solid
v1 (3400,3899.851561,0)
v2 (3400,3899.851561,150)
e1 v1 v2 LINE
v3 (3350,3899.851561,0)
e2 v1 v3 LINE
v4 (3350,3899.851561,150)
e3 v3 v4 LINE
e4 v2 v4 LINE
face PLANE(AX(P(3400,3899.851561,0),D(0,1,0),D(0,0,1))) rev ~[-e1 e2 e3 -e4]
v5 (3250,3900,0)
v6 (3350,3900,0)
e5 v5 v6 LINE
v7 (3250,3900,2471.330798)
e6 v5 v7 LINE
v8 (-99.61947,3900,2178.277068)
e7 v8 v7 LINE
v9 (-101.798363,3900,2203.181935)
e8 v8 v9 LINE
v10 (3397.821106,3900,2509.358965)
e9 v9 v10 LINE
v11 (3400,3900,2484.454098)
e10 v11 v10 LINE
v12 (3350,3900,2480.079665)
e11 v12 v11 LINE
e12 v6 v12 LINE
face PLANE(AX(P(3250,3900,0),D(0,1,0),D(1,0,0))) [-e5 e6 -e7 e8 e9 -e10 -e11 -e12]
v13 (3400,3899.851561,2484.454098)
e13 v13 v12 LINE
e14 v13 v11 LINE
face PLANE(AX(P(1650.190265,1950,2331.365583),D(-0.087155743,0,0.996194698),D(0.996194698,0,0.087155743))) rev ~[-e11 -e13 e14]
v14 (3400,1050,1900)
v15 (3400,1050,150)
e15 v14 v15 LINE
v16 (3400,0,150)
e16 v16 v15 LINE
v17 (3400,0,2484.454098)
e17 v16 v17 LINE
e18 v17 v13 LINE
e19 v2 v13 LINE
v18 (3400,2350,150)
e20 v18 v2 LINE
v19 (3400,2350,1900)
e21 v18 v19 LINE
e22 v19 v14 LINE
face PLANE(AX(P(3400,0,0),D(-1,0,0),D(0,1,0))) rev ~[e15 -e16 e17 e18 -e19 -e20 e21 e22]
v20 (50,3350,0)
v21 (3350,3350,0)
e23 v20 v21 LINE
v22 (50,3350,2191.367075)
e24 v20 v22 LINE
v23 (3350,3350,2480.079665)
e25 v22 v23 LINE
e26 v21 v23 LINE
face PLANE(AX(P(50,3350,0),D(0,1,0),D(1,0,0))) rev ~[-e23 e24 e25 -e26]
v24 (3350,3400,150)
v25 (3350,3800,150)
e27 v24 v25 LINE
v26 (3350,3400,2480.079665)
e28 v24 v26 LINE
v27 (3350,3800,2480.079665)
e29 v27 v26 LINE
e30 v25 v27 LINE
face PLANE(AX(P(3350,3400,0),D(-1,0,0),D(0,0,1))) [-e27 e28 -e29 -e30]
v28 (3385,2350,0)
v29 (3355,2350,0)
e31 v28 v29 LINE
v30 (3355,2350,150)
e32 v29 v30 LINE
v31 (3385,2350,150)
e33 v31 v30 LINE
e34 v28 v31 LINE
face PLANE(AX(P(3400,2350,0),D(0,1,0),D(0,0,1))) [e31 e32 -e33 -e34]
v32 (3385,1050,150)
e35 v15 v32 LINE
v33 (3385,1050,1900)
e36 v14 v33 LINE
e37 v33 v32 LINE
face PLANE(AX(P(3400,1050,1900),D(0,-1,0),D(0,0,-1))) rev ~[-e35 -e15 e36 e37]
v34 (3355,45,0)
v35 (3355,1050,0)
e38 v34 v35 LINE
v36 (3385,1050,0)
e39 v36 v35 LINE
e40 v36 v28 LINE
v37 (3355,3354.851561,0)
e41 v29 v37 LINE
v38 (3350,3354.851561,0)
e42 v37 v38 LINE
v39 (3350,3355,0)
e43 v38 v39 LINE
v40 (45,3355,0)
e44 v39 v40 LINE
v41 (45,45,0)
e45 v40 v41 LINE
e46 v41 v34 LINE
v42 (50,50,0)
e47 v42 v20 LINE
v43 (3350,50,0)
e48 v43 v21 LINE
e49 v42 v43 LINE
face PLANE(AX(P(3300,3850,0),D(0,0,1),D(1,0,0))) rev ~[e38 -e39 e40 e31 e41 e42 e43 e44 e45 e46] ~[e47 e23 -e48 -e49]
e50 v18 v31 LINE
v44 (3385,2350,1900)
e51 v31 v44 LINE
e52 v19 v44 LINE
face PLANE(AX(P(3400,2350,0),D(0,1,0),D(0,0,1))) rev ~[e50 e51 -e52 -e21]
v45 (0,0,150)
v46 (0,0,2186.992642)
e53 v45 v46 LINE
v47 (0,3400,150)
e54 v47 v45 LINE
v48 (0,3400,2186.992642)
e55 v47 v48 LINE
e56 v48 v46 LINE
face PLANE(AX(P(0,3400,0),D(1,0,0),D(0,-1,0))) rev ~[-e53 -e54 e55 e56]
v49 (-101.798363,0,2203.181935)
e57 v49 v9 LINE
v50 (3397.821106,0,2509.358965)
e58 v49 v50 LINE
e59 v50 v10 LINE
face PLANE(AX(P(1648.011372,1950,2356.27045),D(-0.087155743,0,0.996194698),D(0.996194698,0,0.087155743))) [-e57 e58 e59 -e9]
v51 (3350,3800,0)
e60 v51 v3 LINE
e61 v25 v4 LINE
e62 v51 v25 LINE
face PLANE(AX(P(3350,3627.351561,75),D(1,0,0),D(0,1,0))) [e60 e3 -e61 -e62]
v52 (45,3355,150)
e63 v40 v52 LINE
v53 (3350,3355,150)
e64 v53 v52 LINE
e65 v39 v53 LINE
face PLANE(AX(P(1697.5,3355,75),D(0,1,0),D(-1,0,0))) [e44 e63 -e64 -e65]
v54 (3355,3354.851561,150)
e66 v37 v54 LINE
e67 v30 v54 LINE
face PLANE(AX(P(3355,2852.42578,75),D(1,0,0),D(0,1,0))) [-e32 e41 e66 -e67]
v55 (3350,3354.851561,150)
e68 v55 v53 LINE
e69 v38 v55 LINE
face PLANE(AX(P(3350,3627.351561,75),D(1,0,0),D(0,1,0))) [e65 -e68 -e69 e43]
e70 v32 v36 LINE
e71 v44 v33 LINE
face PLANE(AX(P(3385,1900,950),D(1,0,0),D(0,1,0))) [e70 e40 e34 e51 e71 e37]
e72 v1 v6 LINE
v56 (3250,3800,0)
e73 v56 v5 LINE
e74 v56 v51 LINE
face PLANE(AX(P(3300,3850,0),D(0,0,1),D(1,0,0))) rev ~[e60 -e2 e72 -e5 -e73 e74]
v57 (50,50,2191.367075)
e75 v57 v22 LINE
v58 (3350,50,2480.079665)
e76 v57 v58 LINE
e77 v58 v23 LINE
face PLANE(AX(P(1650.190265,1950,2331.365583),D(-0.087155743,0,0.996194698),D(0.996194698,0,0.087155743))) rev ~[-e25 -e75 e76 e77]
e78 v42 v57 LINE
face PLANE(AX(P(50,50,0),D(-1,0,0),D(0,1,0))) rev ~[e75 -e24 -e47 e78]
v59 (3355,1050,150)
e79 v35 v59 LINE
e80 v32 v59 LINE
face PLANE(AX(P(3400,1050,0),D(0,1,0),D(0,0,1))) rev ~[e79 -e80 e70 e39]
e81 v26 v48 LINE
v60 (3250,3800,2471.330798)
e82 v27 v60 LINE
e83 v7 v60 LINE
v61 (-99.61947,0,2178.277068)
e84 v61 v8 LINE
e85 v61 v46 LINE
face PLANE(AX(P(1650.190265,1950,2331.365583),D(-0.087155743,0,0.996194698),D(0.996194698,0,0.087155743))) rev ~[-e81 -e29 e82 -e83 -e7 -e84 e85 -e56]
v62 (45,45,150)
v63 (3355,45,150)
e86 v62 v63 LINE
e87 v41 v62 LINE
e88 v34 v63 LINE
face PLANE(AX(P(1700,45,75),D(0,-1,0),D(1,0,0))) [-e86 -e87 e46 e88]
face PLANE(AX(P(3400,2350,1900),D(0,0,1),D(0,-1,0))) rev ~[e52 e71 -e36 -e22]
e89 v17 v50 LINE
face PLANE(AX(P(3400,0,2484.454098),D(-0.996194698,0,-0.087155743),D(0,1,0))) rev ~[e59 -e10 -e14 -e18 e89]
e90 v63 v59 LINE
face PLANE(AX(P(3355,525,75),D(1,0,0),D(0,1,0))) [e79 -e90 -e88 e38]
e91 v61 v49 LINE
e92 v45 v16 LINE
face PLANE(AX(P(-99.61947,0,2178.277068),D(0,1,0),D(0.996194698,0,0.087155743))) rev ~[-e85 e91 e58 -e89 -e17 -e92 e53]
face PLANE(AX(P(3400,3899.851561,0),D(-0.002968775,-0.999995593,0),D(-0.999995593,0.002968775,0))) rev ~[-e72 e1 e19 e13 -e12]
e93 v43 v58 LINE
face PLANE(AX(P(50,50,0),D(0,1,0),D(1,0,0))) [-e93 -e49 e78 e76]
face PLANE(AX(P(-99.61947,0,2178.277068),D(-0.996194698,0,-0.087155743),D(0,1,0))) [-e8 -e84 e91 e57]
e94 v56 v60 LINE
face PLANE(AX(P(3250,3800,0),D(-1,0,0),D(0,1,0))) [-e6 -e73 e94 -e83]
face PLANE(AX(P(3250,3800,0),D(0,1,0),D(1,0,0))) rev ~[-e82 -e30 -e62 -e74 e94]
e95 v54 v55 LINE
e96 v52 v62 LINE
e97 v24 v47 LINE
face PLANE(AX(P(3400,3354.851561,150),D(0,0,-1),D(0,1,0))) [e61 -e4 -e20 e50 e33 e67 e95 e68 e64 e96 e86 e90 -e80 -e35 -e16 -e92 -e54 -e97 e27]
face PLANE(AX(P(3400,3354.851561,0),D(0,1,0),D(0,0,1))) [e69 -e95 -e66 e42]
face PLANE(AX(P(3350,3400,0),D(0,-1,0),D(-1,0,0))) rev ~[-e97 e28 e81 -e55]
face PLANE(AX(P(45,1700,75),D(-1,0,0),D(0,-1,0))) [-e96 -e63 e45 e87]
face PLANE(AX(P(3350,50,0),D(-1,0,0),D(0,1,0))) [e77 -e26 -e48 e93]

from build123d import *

# Parameters (mm, degrees)
F0_W      = 3300
F0_H      = 3300
F3_REACH  = 7658.4274260304
F4_W      = 3512.9874476474
F4_H      = 3900
F5_DEPTH  = 25
F0_W_2    = 100
F0_H_2    = 100
F8_DEPTH  = 15
F10_W     = 3400
F10_H     = 150
F11_DEPTH = 45
F9_W      = 3400
F9_H      = 150
F12_DEPTH = 45
F13_W     = 3305
F13_H     = 150
F14_DEPTH = 45
F7_W      = 1050
F7_H      = 150
F15_DEPTH = 45
F7_W_2    = 1004.8515605927
F16_DEPTH = 45
F7_W_3    = 545
F17_DEPTH = 50


with BuildPart() as f3:
    f3_end = Plane(origin=(-189.8836434212, 0, 2170.3799757433), x_dir=(0.9961946981, 0, 0.0871557427), z_dir=(-0.0871557427, 0, 0.9961946981))
    # F0 (on Top) → F3 (new body, up to a plane its end follows)
    with BuildSketch(Plane.XY):
        Polygon((0, 3400), (0, 0), (3400, 0), (3400, 3400), (3400, 3899.8515605927), (3350, 3900), (3350, 3800), (3350, 3400), align=None)
        with Locations((1700, 1700)):
            Rectangle(F0_W, F0_H, mode=Mode.SUBTRACT)
    f3_long = extrude(amount=F3_REACH, mode=Mode.PRIVATE)
    add(split(f3_long, bisect_by=f3_end, keep=Keep.BOTTOM, mode=Mode.PRIVATE))

    # F4 (on offset) → F5 (join)
    with BuildSketch(Plane(origin=(-189.8836434212, 0, 2170.3799757433), x_dir=(0.9961946981, 0, 0.0871557427), z_dir=(-0.0871557427, 0, 0.9961946981))):
        with Locations((1847.1026919149, 1950)):
            Rectangle(F4_W, F4_H)
    extrude(amount=F5_DEPTH)

    # F0 (on Top) → F6 (join, up to the next surface of F3)
    with BuildSketch(Plane.XY):
        with Locations((3300, 3850)):
            Rectangle(F0_W_2, F0_H_2)
    extrude(until=Until.NEXT)

    # F7 (on face) → F8 (cut)
    with BuildSketch(Plane.YZ.offset(3400)):
        Polygon((1450, 1900), (1450, 0), (2350, 0), (2350, 150), (2350, 275), (2350, 400), (2350, 525), (2350, 650), (2350, 775), (2350, 900), (2350, 1025), (2350, 1150), (2350, 1275), (2350, 1400), (2350, 1525), (2350, 1650), (2350, 1775), (2350, 1900), align=None)
        Polygon((1050, 150), (1050, 0), (1450, 0), (1450, 1900), (1050, 1900), (1050, 1775), (1050, 1650), (1050, 1525), (1050, 1400), (1050, 1275), (1050, 1150), (1050, 1025), (1050, 900), (1050, 775), (1050, 650), (1050, 525), (1050, 400), (1050, 275), align=None)
    extrude(amount=-F8_DEPTH, mode=Mode.SUBTRACT)

    # F10 (on face) → F11 (cut)
    with BuildSketch(Plane(origin=(0, 0, 0), x_dir=(0, -1, 0), z_dir=(-1, 0, 0))):
        with Locations((-1700, 75)):
            Rectangle(F10_W, F10_H)
    extrude(amount=-F11_DEPTH, mode=Mode.SUBTRACT)

    # F9 (on face) → F12 (cut)
    with BuildSketch(Plane.XZ):
        with Locations((1700, 75)):
            Rectangle(F9_W, F9_H)
    extrude(amount=-F12_DEPTH, mode=Mode.SUBTRACT)

    # F13 (on face) → F14 (cut)
    with BuildSketch(Plane(origin=(0, 3400, 0), x_dir=(-1, 0, 0), z_dir=(0, 1, 0))):
        with Locations((-1697.5, 75)):
            Rectangle(F13_W, F13_H)
    extrude(amount=-F14_DEPTH, mode=Mode.SUBTRACT)

    # F7 (on face) → F15 (cut)
    with BuildSketch(Plane.YZ.offset(3400)):
        with Locations((525, 75)):
            Rectangle(F7_W, F7_H)
    extrude(amount=-F15_DEPTH, mode=Mode.SUBTRACT)

    # F7 (on face) → F16 (cut)
    with BuildSketch(Plane.YZ.offset(3400)):
        with Locations((2852.4257802963, 75)):
            Rectangle(F7_W_2, F7_H)
    extrude(amount=-F16_DEPTH, mode=Mode.SUBTRACT)

    # F7 (on face) → F17 (cut)
    with BuildSketch(Plane.YZ.offset(3400)):
        with Locations((3627.3515605927, 75)):
            Rectangle(F7_W_3, F7_H)
    extrude(amount=-F17_DEPTH, mode=Mode.SUBTRACT)


solid = f3.part
